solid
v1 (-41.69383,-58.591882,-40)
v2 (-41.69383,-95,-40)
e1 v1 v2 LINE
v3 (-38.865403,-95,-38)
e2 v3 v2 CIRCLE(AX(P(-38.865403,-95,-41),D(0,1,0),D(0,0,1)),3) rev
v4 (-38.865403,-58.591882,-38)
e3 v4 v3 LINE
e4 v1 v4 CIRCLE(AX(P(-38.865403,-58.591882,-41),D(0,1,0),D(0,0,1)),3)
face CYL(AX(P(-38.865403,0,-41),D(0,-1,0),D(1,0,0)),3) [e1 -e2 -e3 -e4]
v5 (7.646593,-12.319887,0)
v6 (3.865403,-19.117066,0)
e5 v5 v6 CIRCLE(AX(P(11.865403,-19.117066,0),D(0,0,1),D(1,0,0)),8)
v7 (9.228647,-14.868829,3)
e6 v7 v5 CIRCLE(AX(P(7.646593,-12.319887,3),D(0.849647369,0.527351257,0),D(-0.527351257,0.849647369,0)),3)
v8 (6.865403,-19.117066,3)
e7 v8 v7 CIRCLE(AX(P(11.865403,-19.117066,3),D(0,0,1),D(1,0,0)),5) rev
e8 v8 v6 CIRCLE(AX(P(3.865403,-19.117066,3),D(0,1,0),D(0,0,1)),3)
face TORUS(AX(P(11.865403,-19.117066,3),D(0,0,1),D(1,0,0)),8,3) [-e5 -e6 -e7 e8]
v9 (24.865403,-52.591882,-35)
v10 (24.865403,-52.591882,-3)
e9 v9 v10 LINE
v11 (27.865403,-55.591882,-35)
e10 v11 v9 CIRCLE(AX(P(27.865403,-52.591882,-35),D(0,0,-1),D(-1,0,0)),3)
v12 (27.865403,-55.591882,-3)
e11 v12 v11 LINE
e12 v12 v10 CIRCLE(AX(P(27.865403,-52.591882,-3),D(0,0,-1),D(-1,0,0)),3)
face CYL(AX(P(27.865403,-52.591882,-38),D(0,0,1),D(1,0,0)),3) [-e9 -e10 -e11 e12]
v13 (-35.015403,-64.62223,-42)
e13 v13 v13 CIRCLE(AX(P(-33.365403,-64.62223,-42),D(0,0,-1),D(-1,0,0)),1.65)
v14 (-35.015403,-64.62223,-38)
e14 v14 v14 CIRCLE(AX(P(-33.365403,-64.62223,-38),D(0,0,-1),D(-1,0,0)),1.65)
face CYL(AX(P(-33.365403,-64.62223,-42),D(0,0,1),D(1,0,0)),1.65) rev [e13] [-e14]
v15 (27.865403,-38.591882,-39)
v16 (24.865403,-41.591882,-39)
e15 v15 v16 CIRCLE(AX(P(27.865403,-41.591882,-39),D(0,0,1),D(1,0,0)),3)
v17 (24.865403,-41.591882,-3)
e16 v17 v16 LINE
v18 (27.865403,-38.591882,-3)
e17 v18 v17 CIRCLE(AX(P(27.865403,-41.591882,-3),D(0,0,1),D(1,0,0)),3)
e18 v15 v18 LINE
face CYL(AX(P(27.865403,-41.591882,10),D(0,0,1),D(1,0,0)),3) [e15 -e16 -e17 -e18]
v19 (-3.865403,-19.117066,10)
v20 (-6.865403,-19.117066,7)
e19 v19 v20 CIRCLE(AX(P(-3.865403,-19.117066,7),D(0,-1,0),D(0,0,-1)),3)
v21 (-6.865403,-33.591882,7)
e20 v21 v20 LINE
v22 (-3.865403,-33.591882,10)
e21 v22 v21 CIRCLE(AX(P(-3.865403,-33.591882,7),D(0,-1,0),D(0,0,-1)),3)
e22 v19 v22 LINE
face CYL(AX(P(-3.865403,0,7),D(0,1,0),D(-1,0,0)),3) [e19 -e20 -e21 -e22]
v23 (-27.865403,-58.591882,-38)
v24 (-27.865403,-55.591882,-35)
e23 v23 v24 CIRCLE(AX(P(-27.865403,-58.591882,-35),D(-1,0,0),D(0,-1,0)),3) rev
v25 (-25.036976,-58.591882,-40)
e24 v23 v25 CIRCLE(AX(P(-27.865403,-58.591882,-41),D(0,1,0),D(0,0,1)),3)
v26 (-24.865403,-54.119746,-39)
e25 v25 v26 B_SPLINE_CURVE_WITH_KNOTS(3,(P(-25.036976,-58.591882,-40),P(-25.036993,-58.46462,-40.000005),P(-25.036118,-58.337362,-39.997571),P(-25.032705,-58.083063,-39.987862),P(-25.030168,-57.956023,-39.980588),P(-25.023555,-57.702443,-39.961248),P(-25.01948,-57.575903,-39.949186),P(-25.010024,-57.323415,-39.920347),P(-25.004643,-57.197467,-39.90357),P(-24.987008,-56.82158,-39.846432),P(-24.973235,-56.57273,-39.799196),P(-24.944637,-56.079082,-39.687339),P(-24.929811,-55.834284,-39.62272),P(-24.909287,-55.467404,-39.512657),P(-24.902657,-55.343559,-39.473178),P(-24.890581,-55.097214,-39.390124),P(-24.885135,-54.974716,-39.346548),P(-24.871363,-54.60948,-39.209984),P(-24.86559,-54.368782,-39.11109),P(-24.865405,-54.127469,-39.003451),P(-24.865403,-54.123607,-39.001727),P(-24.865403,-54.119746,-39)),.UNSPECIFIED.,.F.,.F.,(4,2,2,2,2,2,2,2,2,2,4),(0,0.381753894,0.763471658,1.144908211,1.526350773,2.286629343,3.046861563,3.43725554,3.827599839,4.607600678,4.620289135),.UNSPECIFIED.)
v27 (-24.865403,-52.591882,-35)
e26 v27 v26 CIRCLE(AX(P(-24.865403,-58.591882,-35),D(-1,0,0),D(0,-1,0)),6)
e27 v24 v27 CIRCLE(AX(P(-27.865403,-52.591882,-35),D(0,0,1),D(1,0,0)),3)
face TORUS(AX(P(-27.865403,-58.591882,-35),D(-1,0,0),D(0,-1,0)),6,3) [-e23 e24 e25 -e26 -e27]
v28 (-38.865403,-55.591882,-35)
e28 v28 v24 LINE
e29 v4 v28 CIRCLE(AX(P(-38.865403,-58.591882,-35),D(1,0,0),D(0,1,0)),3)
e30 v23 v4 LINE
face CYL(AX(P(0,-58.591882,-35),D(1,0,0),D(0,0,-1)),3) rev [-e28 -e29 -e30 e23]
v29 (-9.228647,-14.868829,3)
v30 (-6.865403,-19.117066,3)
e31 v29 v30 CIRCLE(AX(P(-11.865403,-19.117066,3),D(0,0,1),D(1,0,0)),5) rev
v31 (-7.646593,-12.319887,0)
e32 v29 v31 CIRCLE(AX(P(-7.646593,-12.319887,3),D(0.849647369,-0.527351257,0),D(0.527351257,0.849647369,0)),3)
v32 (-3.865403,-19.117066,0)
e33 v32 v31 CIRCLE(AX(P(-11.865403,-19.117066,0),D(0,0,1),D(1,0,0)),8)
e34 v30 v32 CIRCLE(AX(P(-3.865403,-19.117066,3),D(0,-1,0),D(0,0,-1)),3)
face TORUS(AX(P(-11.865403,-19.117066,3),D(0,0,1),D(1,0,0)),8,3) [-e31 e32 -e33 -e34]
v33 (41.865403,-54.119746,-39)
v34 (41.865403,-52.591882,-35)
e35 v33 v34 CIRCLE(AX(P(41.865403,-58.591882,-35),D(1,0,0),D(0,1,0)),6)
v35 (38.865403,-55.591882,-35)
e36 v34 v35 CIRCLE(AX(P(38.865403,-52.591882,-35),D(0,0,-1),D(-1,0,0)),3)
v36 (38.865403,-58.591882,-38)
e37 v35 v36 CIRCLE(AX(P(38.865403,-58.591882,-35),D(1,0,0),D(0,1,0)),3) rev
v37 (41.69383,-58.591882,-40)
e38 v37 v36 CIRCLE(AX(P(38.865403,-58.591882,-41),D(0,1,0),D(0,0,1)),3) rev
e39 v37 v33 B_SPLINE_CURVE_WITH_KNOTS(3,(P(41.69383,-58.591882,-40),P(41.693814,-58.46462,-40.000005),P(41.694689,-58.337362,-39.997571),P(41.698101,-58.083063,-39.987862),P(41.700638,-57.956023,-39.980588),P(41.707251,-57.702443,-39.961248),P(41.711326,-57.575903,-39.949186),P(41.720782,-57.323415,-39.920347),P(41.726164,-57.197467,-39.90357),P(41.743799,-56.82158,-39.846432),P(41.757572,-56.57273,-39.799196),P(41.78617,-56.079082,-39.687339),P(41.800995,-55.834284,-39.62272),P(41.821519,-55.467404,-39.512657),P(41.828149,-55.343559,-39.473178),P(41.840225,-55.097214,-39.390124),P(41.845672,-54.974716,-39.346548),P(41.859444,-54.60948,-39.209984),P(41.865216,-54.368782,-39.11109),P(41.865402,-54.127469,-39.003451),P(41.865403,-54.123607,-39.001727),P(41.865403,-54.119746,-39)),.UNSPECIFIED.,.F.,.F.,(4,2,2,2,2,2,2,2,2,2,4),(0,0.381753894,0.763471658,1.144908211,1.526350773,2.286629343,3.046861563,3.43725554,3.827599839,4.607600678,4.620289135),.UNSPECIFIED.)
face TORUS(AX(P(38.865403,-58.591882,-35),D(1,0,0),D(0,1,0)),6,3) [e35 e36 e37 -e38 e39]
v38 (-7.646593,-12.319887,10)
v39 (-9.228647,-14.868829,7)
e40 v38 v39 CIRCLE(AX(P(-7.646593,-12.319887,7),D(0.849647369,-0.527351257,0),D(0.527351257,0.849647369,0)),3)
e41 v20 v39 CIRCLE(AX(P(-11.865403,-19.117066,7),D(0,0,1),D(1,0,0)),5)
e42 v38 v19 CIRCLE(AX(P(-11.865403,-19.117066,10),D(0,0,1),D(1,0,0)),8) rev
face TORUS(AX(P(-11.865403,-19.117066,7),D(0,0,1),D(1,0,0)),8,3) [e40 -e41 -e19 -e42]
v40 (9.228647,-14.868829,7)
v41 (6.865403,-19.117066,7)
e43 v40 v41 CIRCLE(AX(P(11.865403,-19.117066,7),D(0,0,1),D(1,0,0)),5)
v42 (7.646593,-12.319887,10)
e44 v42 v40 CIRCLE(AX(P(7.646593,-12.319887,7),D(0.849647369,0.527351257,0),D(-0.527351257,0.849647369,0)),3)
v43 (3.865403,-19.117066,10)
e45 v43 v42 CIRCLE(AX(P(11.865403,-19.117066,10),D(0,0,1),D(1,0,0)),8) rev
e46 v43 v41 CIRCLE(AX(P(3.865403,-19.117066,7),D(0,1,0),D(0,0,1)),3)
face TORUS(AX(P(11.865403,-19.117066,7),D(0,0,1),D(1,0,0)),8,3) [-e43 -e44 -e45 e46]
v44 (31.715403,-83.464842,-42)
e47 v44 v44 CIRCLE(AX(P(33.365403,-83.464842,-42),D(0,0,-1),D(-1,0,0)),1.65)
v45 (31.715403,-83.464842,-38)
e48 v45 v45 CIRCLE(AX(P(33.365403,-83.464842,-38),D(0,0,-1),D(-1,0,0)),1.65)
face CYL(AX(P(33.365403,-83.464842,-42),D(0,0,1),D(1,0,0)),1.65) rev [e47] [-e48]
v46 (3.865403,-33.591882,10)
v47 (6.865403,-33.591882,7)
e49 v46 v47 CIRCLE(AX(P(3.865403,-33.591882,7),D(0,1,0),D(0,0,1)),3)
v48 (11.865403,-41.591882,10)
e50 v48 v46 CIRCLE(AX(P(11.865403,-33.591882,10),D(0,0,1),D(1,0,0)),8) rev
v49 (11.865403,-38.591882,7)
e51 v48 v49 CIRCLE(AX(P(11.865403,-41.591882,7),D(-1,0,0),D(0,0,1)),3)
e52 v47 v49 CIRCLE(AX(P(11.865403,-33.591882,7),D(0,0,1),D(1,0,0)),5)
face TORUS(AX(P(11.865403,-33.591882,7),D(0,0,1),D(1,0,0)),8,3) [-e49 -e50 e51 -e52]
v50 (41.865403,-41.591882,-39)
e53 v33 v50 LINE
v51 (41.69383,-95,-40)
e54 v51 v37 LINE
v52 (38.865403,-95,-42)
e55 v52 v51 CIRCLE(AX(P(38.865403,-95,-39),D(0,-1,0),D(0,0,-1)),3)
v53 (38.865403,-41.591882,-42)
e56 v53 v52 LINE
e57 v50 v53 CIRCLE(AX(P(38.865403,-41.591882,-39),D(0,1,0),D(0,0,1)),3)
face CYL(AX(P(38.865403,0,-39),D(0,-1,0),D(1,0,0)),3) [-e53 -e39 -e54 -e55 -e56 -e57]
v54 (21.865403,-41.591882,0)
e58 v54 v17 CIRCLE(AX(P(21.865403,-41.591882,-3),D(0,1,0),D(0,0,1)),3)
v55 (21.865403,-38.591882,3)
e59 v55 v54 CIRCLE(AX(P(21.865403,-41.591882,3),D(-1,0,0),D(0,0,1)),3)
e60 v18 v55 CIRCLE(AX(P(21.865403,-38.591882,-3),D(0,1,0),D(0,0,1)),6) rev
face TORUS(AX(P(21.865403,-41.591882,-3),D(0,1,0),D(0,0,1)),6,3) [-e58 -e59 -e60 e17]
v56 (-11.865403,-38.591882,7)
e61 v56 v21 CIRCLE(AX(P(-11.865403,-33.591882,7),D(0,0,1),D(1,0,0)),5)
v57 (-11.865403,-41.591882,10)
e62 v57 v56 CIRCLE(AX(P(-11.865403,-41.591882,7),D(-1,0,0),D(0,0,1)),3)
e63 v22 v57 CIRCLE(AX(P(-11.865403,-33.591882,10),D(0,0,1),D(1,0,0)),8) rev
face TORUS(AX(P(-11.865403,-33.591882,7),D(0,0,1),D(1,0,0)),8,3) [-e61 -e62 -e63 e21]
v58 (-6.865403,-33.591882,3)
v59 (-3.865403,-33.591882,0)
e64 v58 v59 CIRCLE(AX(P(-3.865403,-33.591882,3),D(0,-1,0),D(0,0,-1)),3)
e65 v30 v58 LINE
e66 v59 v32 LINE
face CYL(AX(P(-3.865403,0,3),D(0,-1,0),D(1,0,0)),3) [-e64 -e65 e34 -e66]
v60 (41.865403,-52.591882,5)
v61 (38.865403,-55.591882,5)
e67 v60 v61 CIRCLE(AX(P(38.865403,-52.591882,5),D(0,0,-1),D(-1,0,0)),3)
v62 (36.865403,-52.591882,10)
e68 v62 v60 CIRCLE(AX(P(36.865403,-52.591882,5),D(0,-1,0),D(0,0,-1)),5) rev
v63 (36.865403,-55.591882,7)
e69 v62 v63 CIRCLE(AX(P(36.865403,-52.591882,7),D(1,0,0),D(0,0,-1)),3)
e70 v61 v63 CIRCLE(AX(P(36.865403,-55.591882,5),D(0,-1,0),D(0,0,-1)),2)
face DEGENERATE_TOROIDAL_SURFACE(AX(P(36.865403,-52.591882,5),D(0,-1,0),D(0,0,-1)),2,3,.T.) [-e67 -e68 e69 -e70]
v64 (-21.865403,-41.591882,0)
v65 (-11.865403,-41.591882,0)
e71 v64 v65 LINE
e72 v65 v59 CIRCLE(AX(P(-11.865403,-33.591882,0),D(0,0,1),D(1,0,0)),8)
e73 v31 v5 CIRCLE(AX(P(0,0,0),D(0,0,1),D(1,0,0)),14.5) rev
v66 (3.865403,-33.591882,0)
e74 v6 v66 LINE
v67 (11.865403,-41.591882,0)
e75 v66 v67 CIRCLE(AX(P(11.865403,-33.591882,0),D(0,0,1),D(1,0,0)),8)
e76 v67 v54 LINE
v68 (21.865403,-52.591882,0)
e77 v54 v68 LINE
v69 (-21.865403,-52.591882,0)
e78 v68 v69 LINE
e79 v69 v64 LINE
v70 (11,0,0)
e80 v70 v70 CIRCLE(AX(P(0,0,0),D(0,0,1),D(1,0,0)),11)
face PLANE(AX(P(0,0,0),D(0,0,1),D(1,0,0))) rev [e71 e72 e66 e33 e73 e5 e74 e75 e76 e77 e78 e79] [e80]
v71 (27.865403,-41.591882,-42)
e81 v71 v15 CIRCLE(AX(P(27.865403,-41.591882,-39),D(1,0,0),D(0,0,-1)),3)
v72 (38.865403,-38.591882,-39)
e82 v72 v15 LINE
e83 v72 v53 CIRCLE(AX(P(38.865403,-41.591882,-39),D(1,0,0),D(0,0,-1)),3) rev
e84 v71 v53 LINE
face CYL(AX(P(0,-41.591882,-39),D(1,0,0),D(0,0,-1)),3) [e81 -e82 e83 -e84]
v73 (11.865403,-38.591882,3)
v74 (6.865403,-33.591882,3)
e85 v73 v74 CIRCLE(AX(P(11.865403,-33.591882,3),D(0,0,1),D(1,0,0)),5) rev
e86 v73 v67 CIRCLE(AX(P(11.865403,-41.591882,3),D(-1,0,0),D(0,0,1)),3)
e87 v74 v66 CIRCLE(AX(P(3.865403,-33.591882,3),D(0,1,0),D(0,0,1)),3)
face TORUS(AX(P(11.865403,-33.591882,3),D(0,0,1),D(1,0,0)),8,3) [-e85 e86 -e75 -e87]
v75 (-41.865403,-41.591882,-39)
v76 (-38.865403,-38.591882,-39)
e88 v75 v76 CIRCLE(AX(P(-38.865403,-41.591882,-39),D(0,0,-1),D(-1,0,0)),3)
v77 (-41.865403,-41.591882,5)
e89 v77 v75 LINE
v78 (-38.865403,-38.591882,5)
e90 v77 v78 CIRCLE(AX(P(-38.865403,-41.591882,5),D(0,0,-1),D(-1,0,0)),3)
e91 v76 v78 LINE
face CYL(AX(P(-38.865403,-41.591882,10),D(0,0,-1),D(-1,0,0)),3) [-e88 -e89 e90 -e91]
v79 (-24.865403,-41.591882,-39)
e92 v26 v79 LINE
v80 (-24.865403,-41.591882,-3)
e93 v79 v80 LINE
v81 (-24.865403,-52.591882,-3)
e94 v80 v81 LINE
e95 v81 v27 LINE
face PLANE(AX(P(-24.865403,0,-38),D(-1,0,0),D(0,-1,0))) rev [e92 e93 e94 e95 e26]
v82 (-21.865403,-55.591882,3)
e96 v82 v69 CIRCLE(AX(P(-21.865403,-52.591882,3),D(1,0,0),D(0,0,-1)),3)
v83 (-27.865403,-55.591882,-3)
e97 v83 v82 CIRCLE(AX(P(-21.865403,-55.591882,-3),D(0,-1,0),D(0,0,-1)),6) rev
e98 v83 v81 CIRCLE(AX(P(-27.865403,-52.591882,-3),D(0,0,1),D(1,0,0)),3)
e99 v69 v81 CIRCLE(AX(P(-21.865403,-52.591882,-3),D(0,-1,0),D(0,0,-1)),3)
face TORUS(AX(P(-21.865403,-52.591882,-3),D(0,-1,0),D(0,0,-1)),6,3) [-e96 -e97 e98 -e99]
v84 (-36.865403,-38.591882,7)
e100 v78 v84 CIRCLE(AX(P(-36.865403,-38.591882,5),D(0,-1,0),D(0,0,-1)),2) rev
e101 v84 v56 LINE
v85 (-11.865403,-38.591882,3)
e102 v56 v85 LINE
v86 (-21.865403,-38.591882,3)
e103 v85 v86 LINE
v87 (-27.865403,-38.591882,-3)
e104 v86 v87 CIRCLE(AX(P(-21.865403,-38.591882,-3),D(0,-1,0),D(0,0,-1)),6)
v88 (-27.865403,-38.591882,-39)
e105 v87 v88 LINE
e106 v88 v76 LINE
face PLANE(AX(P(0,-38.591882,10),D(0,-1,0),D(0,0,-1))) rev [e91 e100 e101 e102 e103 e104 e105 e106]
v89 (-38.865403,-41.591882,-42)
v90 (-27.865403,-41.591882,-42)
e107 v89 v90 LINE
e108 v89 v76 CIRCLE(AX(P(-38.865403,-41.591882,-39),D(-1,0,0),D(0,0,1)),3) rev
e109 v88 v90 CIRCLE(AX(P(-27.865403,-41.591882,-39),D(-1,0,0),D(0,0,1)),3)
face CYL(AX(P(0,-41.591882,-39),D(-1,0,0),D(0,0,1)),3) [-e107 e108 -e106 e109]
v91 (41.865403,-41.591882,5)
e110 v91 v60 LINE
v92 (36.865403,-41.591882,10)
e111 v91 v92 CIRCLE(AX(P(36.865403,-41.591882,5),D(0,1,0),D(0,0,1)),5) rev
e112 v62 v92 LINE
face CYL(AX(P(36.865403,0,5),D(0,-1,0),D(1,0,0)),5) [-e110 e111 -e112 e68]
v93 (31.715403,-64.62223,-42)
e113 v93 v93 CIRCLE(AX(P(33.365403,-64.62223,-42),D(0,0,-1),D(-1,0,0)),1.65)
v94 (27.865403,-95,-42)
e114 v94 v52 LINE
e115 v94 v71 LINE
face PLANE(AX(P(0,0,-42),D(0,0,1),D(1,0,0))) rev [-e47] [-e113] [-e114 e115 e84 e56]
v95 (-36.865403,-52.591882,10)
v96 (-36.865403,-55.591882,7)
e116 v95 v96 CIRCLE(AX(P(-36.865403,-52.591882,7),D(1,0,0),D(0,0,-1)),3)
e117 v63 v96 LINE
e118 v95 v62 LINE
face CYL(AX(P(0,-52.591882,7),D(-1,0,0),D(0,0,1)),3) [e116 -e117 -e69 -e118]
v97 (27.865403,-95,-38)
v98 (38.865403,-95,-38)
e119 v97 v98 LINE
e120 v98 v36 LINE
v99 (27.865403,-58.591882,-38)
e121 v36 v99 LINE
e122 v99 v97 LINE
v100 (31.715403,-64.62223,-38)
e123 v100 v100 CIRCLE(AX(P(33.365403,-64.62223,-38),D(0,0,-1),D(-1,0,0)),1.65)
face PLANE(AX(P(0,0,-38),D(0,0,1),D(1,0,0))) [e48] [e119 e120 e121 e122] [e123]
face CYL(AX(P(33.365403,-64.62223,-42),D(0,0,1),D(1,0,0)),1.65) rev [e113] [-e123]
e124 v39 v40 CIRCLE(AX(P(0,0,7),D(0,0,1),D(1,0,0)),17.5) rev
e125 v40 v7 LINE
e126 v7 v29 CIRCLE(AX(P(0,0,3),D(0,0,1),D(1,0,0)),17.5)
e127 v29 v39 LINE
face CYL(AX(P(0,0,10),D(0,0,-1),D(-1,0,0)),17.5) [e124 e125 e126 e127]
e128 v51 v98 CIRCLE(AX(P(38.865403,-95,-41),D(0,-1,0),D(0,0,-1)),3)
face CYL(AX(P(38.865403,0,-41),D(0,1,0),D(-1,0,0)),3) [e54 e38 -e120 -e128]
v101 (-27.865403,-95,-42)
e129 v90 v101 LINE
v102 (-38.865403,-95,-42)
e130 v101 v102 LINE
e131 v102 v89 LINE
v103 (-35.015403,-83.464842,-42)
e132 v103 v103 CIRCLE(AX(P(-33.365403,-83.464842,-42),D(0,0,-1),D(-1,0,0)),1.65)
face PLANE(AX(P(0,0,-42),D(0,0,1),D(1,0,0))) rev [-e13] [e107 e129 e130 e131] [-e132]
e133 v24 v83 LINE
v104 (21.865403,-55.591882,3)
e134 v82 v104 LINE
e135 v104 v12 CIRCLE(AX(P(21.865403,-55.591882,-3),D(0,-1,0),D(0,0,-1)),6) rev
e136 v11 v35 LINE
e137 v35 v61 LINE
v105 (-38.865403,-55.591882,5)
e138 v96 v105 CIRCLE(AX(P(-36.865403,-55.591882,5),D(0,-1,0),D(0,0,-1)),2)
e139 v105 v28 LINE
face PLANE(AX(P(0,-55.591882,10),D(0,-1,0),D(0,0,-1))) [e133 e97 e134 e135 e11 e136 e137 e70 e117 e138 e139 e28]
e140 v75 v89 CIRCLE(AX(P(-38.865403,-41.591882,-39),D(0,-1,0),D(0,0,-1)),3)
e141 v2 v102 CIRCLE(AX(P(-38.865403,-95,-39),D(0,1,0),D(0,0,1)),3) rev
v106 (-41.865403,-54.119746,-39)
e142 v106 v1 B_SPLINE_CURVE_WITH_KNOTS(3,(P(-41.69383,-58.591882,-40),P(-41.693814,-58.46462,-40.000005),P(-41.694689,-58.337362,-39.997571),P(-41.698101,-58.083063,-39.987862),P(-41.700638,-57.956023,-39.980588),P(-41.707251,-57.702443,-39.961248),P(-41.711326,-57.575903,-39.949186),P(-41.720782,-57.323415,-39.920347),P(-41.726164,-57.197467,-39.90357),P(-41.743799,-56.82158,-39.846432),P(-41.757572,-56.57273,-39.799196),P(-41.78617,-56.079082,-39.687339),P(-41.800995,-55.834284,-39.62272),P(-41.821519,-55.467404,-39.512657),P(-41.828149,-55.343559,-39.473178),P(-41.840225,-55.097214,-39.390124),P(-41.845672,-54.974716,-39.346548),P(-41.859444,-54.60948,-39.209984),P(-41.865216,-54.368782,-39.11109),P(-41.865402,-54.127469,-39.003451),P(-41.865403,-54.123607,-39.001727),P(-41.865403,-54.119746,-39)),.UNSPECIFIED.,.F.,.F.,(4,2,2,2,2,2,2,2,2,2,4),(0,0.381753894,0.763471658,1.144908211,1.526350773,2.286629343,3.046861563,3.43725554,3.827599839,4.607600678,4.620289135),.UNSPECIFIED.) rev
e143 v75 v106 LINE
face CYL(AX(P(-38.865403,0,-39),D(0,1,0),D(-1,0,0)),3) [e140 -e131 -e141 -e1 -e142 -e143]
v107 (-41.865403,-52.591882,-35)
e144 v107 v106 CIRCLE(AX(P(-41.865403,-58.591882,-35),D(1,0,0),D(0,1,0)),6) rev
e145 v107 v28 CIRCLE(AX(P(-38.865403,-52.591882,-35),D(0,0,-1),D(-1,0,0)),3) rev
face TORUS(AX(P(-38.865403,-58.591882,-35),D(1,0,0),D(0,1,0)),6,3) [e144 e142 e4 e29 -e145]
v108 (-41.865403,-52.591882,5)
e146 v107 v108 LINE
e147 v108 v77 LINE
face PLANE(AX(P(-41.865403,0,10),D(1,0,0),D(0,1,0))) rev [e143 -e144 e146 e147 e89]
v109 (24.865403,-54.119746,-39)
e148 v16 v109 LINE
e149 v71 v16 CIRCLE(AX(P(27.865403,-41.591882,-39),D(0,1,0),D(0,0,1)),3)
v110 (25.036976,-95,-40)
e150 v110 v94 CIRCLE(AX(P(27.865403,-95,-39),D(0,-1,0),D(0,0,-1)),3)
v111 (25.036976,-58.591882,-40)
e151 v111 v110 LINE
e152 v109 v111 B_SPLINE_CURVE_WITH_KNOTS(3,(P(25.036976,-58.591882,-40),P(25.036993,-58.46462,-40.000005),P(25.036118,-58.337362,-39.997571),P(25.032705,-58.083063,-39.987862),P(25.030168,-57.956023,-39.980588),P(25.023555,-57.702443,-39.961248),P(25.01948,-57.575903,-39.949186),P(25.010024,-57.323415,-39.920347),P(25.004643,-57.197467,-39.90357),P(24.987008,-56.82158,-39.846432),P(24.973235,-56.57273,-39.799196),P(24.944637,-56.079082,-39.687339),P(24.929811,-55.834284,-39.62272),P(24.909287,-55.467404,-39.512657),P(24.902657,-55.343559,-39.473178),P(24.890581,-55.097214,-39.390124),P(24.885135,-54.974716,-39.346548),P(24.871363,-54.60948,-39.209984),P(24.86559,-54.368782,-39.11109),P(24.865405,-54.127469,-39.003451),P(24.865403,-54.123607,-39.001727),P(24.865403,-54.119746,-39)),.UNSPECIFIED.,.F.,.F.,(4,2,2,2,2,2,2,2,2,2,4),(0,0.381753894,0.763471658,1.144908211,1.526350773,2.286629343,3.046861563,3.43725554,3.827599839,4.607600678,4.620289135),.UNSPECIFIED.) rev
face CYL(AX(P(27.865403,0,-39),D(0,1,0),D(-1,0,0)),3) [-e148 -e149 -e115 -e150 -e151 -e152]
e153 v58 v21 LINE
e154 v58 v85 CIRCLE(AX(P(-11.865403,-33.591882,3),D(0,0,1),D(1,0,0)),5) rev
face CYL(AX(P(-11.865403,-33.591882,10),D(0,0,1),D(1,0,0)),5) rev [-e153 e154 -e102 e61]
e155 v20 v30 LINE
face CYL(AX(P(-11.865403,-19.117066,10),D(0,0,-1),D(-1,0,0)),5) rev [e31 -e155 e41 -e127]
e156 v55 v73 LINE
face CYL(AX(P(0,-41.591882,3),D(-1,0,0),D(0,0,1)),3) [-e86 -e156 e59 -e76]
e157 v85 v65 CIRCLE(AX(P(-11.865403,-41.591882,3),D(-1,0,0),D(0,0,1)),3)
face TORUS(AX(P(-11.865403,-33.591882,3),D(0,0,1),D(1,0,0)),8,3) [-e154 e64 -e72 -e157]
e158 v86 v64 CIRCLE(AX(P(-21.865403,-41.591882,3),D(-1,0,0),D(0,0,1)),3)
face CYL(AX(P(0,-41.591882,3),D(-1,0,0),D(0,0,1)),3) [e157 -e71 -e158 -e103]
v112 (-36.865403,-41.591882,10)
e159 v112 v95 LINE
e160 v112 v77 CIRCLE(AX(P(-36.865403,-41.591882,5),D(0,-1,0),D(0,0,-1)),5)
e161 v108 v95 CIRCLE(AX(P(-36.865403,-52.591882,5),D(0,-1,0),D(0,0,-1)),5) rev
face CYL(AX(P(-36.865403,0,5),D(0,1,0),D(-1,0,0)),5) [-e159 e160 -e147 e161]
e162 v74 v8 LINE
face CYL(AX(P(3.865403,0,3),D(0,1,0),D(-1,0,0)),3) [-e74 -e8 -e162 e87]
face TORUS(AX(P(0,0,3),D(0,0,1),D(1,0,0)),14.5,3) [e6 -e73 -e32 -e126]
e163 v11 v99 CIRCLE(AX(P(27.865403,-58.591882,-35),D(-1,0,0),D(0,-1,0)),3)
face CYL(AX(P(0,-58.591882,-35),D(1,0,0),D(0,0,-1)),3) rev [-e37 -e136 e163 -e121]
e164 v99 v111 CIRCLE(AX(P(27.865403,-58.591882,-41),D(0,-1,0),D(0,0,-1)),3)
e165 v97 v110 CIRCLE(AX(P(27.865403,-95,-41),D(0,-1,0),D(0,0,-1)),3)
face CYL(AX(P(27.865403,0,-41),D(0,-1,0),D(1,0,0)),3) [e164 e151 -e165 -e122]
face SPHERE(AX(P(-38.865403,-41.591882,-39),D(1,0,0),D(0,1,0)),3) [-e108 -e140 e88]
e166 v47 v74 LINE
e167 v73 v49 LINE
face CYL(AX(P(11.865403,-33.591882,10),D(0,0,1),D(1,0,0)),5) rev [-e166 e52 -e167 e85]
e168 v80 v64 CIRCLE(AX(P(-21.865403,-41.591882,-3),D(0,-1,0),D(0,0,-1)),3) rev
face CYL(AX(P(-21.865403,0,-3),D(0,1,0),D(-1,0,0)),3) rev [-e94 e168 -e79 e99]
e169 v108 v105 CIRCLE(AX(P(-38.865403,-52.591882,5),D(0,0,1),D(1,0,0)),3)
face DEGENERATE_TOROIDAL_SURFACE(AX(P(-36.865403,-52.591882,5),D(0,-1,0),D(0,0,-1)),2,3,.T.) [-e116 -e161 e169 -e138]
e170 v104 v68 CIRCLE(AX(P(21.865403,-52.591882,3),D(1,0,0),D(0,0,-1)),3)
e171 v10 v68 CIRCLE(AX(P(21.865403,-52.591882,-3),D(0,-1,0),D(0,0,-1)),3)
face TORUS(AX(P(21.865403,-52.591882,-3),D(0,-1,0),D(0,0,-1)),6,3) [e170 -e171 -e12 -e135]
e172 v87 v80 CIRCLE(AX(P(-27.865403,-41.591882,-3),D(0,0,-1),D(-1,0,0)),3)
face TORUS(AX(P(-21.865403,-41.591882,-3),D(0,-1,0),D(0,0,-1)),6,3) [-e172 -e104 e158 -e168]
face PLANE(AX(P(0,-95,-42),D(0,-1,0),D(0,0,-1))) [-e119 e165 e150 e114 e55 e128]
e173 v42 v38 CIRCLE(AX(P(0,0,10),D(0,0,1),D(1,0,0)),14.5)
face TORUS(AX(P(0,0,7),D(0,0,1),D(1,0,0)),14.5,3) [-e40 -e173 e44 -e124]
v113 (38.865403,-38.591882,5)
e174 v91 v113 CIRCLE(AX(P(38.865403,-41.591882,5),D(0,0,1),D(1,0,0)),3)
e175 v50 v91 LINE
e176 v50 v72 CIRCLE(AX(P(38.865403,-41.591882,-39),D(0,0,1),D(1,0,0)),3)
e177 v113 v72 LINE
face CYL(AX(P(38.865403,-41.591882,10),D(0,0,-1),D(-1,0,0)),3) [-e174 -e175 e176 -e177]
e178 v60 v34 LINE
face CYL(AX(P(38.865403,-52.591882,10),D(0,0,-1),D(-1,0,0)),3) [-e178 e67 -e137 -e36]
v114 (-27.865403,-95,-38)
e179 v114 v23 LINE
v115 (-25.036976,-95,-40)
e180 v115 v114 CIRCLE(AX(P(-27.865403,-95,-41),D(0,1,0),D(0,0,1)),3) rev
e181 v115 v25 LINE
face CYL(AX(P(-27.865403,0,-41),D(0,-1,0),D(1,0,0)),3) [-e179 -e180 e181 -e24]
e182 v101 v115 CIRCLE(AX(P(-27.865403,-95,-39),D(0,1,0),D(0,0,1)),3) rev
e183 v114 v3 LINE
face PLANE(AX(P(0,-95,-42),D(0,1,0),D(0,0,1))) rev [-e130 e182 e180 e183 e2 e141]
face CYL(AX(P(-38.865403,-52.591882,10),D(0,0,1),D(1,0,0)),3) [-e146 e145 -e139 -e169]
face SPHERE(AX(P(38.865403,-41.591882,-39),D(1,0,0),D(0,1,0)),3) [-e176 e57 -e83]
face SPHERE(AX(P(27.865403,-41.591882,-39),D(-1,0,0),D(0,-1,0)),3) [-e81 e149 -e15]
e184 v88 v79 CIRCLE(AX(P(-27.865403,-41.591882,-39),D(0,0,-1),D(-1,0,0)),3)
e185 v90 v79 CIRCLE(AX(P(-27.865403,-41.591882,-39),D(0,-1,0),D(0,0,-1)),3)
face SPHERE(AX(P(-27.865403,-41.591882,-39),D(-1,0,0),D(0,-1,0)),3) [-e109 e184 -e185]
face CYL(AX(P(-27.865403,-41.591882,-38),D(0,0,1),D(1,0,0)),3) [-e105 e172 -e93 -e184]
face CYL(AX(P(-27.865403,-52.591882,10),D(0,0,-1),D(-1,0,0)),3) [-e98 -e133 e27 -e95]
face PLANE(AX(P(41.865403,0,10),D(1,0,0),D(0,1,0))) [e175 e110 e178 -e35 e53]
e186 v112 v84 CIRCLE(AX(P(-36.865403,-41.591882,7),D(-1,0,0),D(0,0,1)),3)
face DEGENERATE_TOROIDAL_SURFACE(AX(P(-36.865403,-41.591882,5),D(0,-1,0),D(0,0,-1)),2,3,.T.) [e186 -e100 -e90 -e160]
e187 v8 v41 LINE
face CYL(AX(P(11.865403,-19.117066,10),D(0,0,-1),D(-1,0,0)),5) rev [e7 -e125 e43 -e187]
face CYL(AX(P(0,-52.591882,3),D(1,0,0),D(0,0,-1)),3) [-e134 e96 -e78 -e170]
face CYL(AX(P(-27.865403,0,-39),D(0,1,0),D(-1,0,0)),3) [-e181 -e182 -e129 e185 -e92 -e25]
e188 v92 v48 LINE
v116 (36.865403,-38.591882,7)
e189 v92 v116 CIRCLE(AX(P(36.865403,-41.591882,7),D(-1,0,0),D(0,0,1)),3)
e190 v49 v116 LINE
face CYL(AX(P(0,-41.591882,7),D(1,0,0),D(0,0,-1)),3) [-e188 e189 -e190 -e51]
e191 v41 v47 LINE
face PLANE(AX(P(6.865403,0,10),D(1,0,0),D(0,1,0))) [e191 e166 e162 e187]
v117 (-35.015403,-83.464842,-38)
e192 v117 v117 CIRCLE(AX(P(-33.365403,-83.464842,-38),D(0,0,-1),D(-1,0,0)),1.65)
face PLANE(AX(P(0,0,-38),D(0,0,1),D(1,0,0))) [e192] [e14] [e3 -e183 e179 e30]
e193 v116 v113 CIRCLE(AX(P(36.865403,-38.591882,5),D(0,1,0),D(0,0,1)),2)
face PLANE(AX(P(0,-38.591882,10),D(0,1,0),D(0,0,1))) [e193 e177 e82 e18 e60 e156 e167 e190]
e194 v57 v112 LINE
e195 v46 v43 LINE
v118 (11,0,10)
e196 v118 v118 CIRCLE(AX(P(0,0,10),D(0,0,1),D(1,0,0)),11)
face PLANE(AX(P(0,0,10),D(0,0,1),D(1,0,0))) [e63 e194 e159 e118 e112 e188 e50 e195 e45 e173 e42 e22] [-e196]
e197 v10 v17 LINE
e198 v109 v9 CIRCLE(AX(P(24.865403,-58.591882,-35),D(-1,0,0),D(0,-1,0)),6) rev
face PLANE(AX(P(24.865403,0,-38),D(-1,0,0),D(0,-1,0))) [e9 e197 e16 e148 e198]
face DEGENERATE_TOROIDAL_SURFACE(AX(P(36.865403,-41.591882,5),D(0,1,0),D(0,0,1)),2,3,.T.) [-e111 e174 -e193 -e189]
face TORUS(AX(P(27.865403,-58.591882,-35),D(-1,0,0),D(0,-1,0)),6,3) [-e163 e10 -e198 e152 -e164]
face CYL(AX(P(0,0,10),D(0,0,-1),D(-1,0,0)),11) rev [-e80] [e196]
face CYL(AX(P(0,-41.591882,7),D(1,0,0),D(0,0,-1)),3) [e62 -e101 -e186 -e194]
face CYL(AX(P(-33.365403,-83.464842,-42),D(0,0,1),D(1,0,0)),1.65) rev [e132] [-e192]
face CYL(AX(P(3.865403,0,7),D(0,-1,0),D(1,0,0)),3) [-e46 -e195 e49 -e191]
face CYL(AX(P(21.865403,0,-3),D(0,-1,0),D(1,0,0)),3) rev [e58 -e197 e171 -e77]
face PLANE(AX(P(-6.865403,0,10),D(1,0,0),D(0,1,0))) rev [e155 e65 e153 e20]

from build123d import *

# Parameters (mm, degrees)
CROQUIS5_R              = 17.5
CROQUIS5_R_2            = 11
SALIENTE_EXTRUIR4_DEPTH = 10
CROQUIS6_W              = 17
CROQUIS6_H              = 17
SALIENTE_EXTRUIR5_DEPTH = 10
REDONDEO2_R             = 5
CROQUIS6_4_W            = 17
CROQUIS6_4_H            = 17
SALIENTE_EXTRUIR6_DEPTH = 38
REDONDEO3_R             = 5
SALIENTE_EXTRUIR7_START = 38
CROQUIS6_5_W            = 17
CROQUIS6_5_H            = 56.408117822
CROQUIS6_5_R            = 1.65
SALIENTE_EXTRUIR7_DEPTH = 4
REDONDEO4_R             = 3
REDONDEO5_R             = 3
REDONDEO6_R             = 3
REDONDEO7_R             = 3


with BuildPart() as part:
    # Croquis5 → Saliente-Extruir4 (new body)
    with BuildSketch(Plane.XY):
        Circle(CROQUIS5_R)
        Circle(CROQUIS5_R_2, mode=Mode.SUBTRACT)
    extrude(amount=SALIENTE_EXTRUIR4_DEPTH)

    # Croquis6 → Saliente-Extruir5 (add)
    with BuildSketch(Plane(origin=(0, 0, 0), x_dir=(-1, 0, 0), z_dir=(0, 0, -1))):
        with BuildLine():
            ThreePointArc((6.86540329, -16.097087863), (0, -17.5), (-6.86540329, -16.097087863))
            Line((-6.86540329, -16.097087863), (-6.86540329, -38.591882178))
            Line((-6.86540329, -38.591882178), (-24.86540329, -38.591882178))
            Line((-24.86540329, -38.591882178), (-24.86540329, -55.591882178))
            Line((-24.86540329, -55.591882178), (24.86540329, -55.591882178))
            Line((24.86540329, -55.591882178), (24.86540329, -38.591882178))
            Line((24.86540329, -38.591882178), (6.86540329, -38.591882178))
            Line((6.86540329, -38.591882178), (6.86540329, -16.097087863))
        make_face()
        with Locations((-33.36540329, -47.091882178)):
            Rectangle(CROQUIS6_W, CROQUIS6_H)
        with Locations((33.36540329, -47.091882178)):
            Rectangle(CROQUIS6_W, CROQUIS6_H)
    extrude(amount=-SALIENTE_EXTRUIR5_DEPTH)

    # Redondeo2
    redondeo2_edges = [part.edges().sort_by_distance(p)[0] for p in [
        (-6.86540329, -16.097087863, 5),
        (-6.86540329, -38.591882178, 5),
        (6.86540329, -38.591882178, 5),
        (6.86540329, -16.097087863, 5),
    ]]
    fillet(redondeo2_edges, radius=REDONDEO2_R)

    # Croquis6<4> → Saliente-Extruir6 (add)
    with BuildSketch(Plane(origin=(0, 0, 0), x_dir=(-1, 0, 0), z_dir=(0, 0, -1))):
        with Locations((33.36540329, -47.091882178)):
            Rectangle(CROQUIS6_4_W, CROQUIS6_4_H)
        with Locations((-33.36540329, -47.091882178)):
            Rectangle(CROQUIS6_4_W, CROQUIS6_4_H)
    extrude(amount=SALIENTE_EXTRUIR6_DEPTH)

    # Redondeo3
    redondeo3_edges = [part.edges().sort_by_distance(p)[0] for p in [
        (41.86540329, -47.091882178, 10),
        (-41.86540329, -47.091882178, 10),
    ]]
    fillet(redondeo3_edges, radius=REDONDEO3_R)

    # Croquis6<5> → Saliente-Extruir7 (add)
    # profile 1 of 2: a face of its own
    with BuildSketch(Plane(origin=(0, 0, 0), x_dir=(-1, 0, 0), z_dir=(0, 0, -1)).offset(SALIENTE_EXTRUIR7_START)):
        with Locations((-33.36540329, -66.795941089)):
            Rectangle(CROQUIS6_5_W, CROQUIS6_5_H)
        with Locations((-33.36540329, -64.62222969)):
            Circle(CROQUIS6_5_R, mode=Mode.SUBTRACT)
        with Locations((-33.36540329, -83.464842185)):
            Circle(CROQUIS6_5_R, mode=Mode.SUBTRACT)
    # profile 2 of 2: a face of its own
    with BuildSketch(Plane(origin=(0, 0, 0), x_dir=(-1, 0, 0), z_dir=(0, 0, -1)).offset(SALIENTE_EXTRUIR7_START)):
        with Locations((33.36540329, -66.795941089)):
            Rectangle(CROQUIS6_5_W, CROQUIS6_5_H)
        with Locations((33.36540329, -64.62222969)):
            Circle(CROQUIS6_5_R, mode=Mode.SUBTRACT)
        with Locations((33.36540329, -83.464842185)):
            Circle(CROQUIS6_5_R, mode=Mode.SUBTRACT)
    extrude(amount=SALIENTE_EXTRUIR7_DEPTH)

    # Redondeo4
    redondeo4_edges = [part.edges().sort_by_distance(p)[0] for p in [
        (0, -55.591882178, 10),
        (-41.86540329, -55.591882178, -16.5),
        (-40.400937196, -55.591882178, 8.535533906),
        (40.400937196, -55.591882178, 8.535533906),
        (-41.86540329, -75.295941089, -38),
        (41.86540329, -75.295941089, -38),
        (-24.86540329, -47.091882178, 0),
        (-33.36540329, -55.591882178, -38),
        (33.36540329, -55.591882178, -38),
        (24.86540329, -47.091882178, 0),
        (41.86540329, -55.591882178, -16.5),
    ]]
    fillet(redondeo4_edges, radius=REDONDEO4_R)

    # Redondeo5
    redondeo5_edges = [part.edges().sort_by_distance(p)[0] for p in [
        (-33.36540329, -38.591882178, -42),
        (33.36540329, -38.591882178, -42),
    ]]
    fillet(redondeo5_edges, radius=REDONDEO5_R)

    # Redondeo6
    redondeo6_edges = [part.edges().sort_by_distance(p)[0] for p in [
        (-24.86540329, -76.795941089, -38),
        (24.86540329, -76.795941089, -38),
        (-24.86540329, -55.591882178, -19),
        (0, -55.591882178, 0),
        (24.86540329, -55.591882178, -19),
        (23.986723634, -55.591882178, -0.878679656),
        (-23.986723634, -55.591882178, -0.878679656),
        (24.86540329, -56.470561835, -37.121320344),
        (-24.86540329, -56.470561835, -37.121320344),
    ]]
    fillet(redondeo6_edges, radius=REDONDEO6_R)

    # Redondeo7
    # the kernel refuses this fillet: 3 mm, written as the material it takes off along each edge
    with BuildSketch(Plane(origin=(-24.86540329, -41.591882178, -42), x_dir=(0, 0, 1), z_dir=(0, -1, 0)), Plane(origin=(24.86540329, -102.5, -42), x_dir=(0, 0, 1), z_dir=(0, 1, 0)), Plane(origin=(41.86540329, -41.591882178, -42), x_dir=(0, 0, 1), z_dir=(0, -1, 0))) as redondeo7_piece_1:
        with BuildLine():
            CenterArc((REDONDEO7_R, REDONDEO7_R), REDONDEO7_R, 180, 90)
            Line((0, REDONDEO7_R), (0, 0))
            Line((0, 0), (REDONDEO7_R, 0))
        make_face()
    extrude(amount=60.908117822, mode=Mode.SUBTRACT)
    with BuildSketch(Plane(origin=(-24.86540329, -41.591882178, -39), x_dir=(0, 1, 0), z_dir=(0, 0, 1))) as redondeo7_piece_2:
        with BuildLine():
            CenterArc((3 - REDONDEO7_R, REDONDEO7_R), REDONDEO7_R, 270, 90)
            Line((3, REDONDEO7_R), (3, 0))
            Line((3, 0), (3 - REDONDEO7_R, 0))
        make_face()
    revolve(axis=Axis((-24.86540329, -41.591882178, -39), (-1, 0, 0)), revolution_arc=90, mode=Mode.SUBTRACT)
    with BuildSketch(Plane(origin=(-24.86540329, -38.591882178, -3), x_dir=(0, -1, 0), z_dir=(0, 0, -1))) as redondeo7_piece_3:
        with BuildLine():
            CenterArc((REDONDEO7_R, REDONDEO7_R), REDONDEO7_R, 180, 90)
            Line((0, REDONDEO7_R), (0, 0))
            Line((0, 0), (REDONDEO7_R, 0))
        make_face()
    extrude(amount=36, mode=Mode.SUBTRACT)
    with BuildSketch(Plane(origin=(-21.86540329, -38.591882178, -3), x_dir=(0, 0, 1), z_dir=(1, 0, 0))) as redondeo7_piece_4:
        with BuildLine():
            CenterArc((3 + REDONDEO7_R, REDONDEO7_R), REDONDEO7_R, 180, 90)
            Line((3 + REDONDEO7_R, 0), (3, 0))
            Line((3, 0), (3, REDONDEO7_R))
        make_face()
    revolve(axis=Axis((-21.86540329, -38.591882178, -3), (0, -1, 0)), revolution_arc=90, mode=Mode.SUBTRACT)
    with BuildSketch(Plane(origin=(-21.86540329, -38.591882178, 0), x_dir=(0, 0, 1), z_dir=(1, 0, 0))) as redondeo7_piece_5:
        with BuildLine():
            CenterArc((REDONDEO7_R, REDONDEO7_R), REDONDEO7_R, 180, 90)
            Line((0, REDONDEO7_R), (0, 0))
            Line((0, 0), (REDONDEO7_R, 0))
        make_face()
    extrude(amount=10, mode=Mode.SUBTRACT)
    with BuildSketch(Plane(origin=(-11.86540329, -33.591882178, 0), x_dir=(1, 0, 0), z_dir=(0, 1, 0))) as redondeo7_piece_6:
        with BuildLine():
            CenterArc((5 + REDONDEO7_R, -REDONDEO7_R), REDONDEO7_R, 90, 90)
            Line((5, -REDONDEO7_R), (5, 0))
            Line((5, 0), (5 + REDONDEO7_R, 0))
        make_face()
    revolve(axis=Axis((-11.86540329, -33.591882178, 0), (0, 0, -1)), revolution_arc=90, mode=Mode.SUBTRACT)
    with BuildSketch(Plane(origin=(-6.86540329, -33.591882178, 10), x_dir=(1, 0, 0), z_dir=(0, 1, 0)), Plane(origin=(6.86540329, -19.117065799, 10), x_dir=(-1, 0, 0), z_dir=(0, -1, 0))) as redondeo7_piece_7:
        with BuildLine():
            CenterArc((REDONDEO7_R, REDONDEO7_R), REDONDEO7_R, 180, 90)
            Line((0, REDONDEO7_R), (0, 0))
            Line((0, 0), (REDONDEO7_R, 0))
        make_face()
    extrude(amount=14.474816379, mode=Mode.SUBTRACT)
    with BuildSketch(Plane(origin=(-6.86540329, -33.591882178, 0), x_dir=(1, 0, 0), z_dir=(0, 1, 0)), Plane(origin=(6.86540329, -19.117065799, 0), x_dir=(-1, 0, 0), z_dir=(0, -1, 0))) as redondeo7_piece_8:
        with BuildLine():
            CenterArc((REDONDEO7_R, -REDONDEO7_R), REDONDEO7_R, 90, 90)
            Line((0, -REDONDEO7_R), (0, 0))
            Line((0, 0), (REDONDEO7_R, 0))
        make_face()
    extrude(amount=14.474816379, mode=Mode.SUBTRACT)
    with BuildSketch(Plane(origin=(-11.86540329, -19.117065799, 0), x_dir=(0.5273512573366691, 0.8496473688451193, 0), z_dir=(-0.8496473688451193, 0.5273512573366691, 0))) as redondeo7_piece_9:
        with BuildLine():
            CenterArc((5 + REDONDEO7_R, -REDONDEO7_R), REDONDEO7_R, 90, 90)
            Line((5, -REDONDEO7_R), (5, 0))
            Line((5, 0), (5 + REDONDEO7_R, 0))
        make_face()
    revolve(axis=Axis((-11.86540329, -19.117065799, 0), (0, 0, -1)), revolution_arc=58.17333597, mode=Mode.SUBTRACT)
    with BuildSketch(Plane(origin=(0, 0, 0), x_dir=(0.527351257336669, -0.8496473688451194, 0), z_dir=(-0.8496473688451194, -0.527351257336669, 0))) as redondeo7_piece_10:
        with BuildLine():
            CenterArc((17.5 - REDONDEO7_R, REDONDEO7_R), REDONDEO7_R, 270, 90)
            Line((17.5, REDONDEO7_R), (17.5, 0))
            Line((17.5, 0), (17.5 - REDONDEO7_R, 0))
        make_face()
    revolve(axis=Axis((0, 0, 0), (0, 0, 1)), revolution_arc=296.346671939, mode=Mode.SUBTRACT)
    with BuildSketch(Plane(origin=(11.86540329, -19.117065799, 0), x_dir=(-0.5273512573366712, 0.8496473688451178, 0), z_dir=(0.8496473688451178, 0.5273512573366712, 0))) as redondeo7_piece_11:
        with BuildLine():
            CenterArc((5 + REDONDEO7_R, REDONDEO7_R), REDONDEO7_R, 180, 90)
            Line((5, REDONDEO7_R), (5, 0))
            Line((5, 0), (5 + REDONDEO7_R, 0))
        make_face()
    revolve(axis=Axis((11.86540329, -19.117065799, 0), (0, 0, 1)), revolution_arc=58.17333597, mode=Mode.SUBTRACT)
    with BuildSketch(Plane(origin=(24.86540329, -41.591882178, -39), x_dir=(0, 1, 0), z_dir=(0, 0, 1))) as redondeo7_piece_12:
        with BuildLine():
            CenterArc((3 - REDONDEO7_R, -REDONDEO7_R), REDONDEO7_R, 0, 90)
            Line((3, -REDONDEO7_R), (3, 0))
            Line((3, 0), (3 - REDONDEO7_R, 0))
        make_face()
    revolve(axis=Axis((24.86540329, -41.591882178, -39), (-1, 0, 0)), revolution_arc=90, mode=Mode.SUBTRACT)
    with BuildSketch(Plane(origin=(24.86540329, -38.591882178, -39), x_dir=(1, 0, 0), z_dir=(0, 0, 1))) as redondeo7_piece_13:
        with BuildLine():
            CenterArc((REDONDEO7_R, -REDONDEO7_R), REDONDEO7_R, 90, 90)
            Line((0, -REDONDEO7_R), (0, 0))
            Line((0, 0), (REDONDEO7_R, 0))
        make_face()
    extrude(amount=36, mode=Mode.SUBTRACT)
    with BuildSketch(Plane(origin=(21.86540329, -38.591882178, -3), x_dir=(0, 0, 1), z_dir=(-1, 0, 0))) as redondeo7_piece_14:
        with BuildLine():
            CenterArc((3 + REDONDEO7_R, -REDONDEO7_R), REDONDEO7_R, 90, 90)
            Line((3 + REDONDEO7_R, 0), (3, 0))
            Line((3, 0), (3, -REDONDEO7_R))
        make_face()
    revolve(axis=Axis((21.86540329, -38.591882178, -3), (0, 1, 0)), revolution_arc=90, mode=Mode.SUBTRACT)
    with BuildSketch(Plane(origin=(11.86540329, -38.591882178, 0), x_dir=(0, -1, 0), z_dir=(1, 0, 0))) as redondeo7_piece_15:
        with BuildLine():
            CenterArc((REDONDEO7_R, -REDONDEO7_R), REDONDEO7_R, 90, 90)
            Line((0, -REDONDEO7_R), (0, 0))
            Line((0, 0), (REDONDEO7_R, 0))
        make_face()
    extrude(amount=10, mode=Mode.SUBTRACT)
    with BuildSketch(Plane(origin=(11.86540329, -33.591882178, 0), x_dir=(0, -1, 0), z_dir=(1, 0, 0))) as redondeo7_piece_16:
        with BuildLine():
            CenterArc((5 + REDONDEO7_R, -REDONDEO7_R), REDONDEO7_R, 90, 90)
            Line((5, -REDONDEO7_R), (5, 0))
            Line((5, 0), (5 + REDONDEO7_R, 0))
        make_face()
    revolve(axis=Axis((11.86540329, -33.591882178, 0), (0, 0, -1)), revolution_arc=90, mode=Mode.SUBTRACT)
    with BuildSketch(Plane(origin=(-41.86540329, -102.5, -42), x_dir=(1, 0, 0), z_dir=(0, 1, 0))) as redondeo7_piece_17:
        with BuildLine():
            CenterArc((REDONDEO7_R, -REDONDEO7_R), REDONDEO7_R, 90, 90)
            Line((0, -REDONDEO7_R), (0, 0))
            Line((0, 0), (REDONDEO7_R, 0))
        make_face()
    extrude(amount=60.908117822, mode=Mode.SUBTRACT)
    with BuildSketch(Plane(origin=(-41.86540329, -41.591882178, -39), x_dir=(0, 1, 0), z_dir=(0, 0, 1))) as redondeo7_piece_18:
        with BuildLine():
            CenterArc((3 - REDONDEO7_R, -REDONDEO7_R), REDONDEO7_R, 0, 90)
            Line((3 - REDONDEO7_R, 0), (3, 0))
            Line((3, 0), (3, -REDONDEO7_R))
        make_face()
    revolve(axis=Axis((-41.86540329, -41.591882178, -39), (-1, 0, 0)), revolution_arc=90, mode=Mode.SUBTRACT)
    with BuildSketch(Plane(origin=(-41.86540329, -38.591882178, -39), x_dir=(1, 0, 0), z_dir=(0, 0, 1)), Plane(origin=(41.86540329, -38.591882178, 5), x_dir=(-1, 0, 0), z_dir=(0, 0, -1))) as redondeo7_piece_19:
        with BuildLine():
            CenterArc((REDONDEO7_R, -REDONDEO7_R), REDONDEO7_R, 90, 90)
            Line((0, -REDONDEO7_R), (0, 0))
            Line((0, 0), (REDONDEO7_R, 0))
        make_face()
    extrude(amount=44, mode=Mode.SUBTRACT)
    with BuildSketch(Plane(origin=(-36.86540329, -38.591882178, 5), x_dir=(0, 0, 1), z_dir=(1, 0, 0))) as redondeo7_piece_20:
        with BuildLine():
            CenterArc((5 - REDONDEO7_R, REDONDEO7_R), REDONDEO7_R, 270, 90)
            Line((5, REDONDEO7_R), (5, 0))
            Line((5, 0), (5 - REDONDEO7_R, 0))
        make_face()
    revolve(axis=Axis((-36.86540329, -38.591882178, 5), (0, -1, 0)), revolution_arc=90, mode=Mode.SUBTRACT)
    with BuildSketch(Plane(origin=(-11.86540329, -33.591882178, 10), x_dir=(1, 0, 0), z_dir=(0, 1, 0))) as redondeo7_piece_21:
        with BuildLine():
            CenterArc((5 + REDONDEO7_R, REDONDEO7_R), REDONDEO7_R, 180, 90)
            Line((5 + REDONDEO7_R, 0), (5, 0))
            Line((5, 0), (5, REDONDEO7_R))
        make_face()
    revolve(axis=Axis((-11.86540329, -33.591882178, 10), (0, 0, -1)), revolution_arc=90, mode=Mode.SUBTRACT)
    with BuildSketch(Plane(origin=(-11.86540329, -19.117065799, 10), x_dir=(0.5273512573366684, 0.8496473688451196, 0), z_dir=(-0.8496473688451196, 0.5273512573366684, 0))) as redondeo7_piece_22:
        with BuildLine():
            CenterArc((5 + REDONDEO7_R, REDONDEO7_R), REDONDEO7_R, 180, 90)
            Line((5, REDONDEO7_R), (5, 0))
            Line((5, 0), (5 + REDONDEO7_R, 0))
        make_face()
    revolve(axis=Axis((-11.86540329, -19.117065799, 10), (0, 0, -1)), revolution_arc=58.17333597, mode=Mode.SUBTRACT)
    with BuildSketch(Plane(origin=(0, 0, 10), x_dir=(-0.5273512573366697, -0.8496473688451189, 0), z_dir=(0.8496473688451189, -0.5273512573366697, 0))) as redondeo7_piece_23:
        with BuildLine():
            CenterArc((17.5 - REDONDEO7_R, REDONDEO7_R), REDONDEO7_R, 270, 90)
            Line((17.5, REDONDEO7_R), (17.5, 0))
            Line((17.5, 0), (17.5 - REDONDEO7_R, 0))
        make_face()
    revolve(axis=Axis((0, 0, 10), (0, 0, -1)), revolution_arc=296.346671939, mode=Mode.SUBTRACT)
    with BuildSketch(Plane(origin=(11.86540329, -19.117065799, 10), x_dir=(-0.5273512573366712, 0.8496473688451178, 0), z_dir=(0.8496473688451178, 0.5273512573366712, 0))) as redondeo7_piece_24:
        with BuildLine():
            CenterArc((5 + REDONDEO7_R, -REDONDEO7_R), REDONDEO7_R, 90, 90)
            Line((5, -REDONDEO7_R), (5, 0))
            Line((5, 0), (5 + REDONDEO7_R, 0))
        make_face()
    revolve(axis=Axis((11.86540329, -19.117065799, 10), (0, 0, 1)), revolution_arc=58.17333597, mode=Mode.SUBTRACT)
    with BuildSketch(Plane(origin=(11.86540329, -33.591882178, 10), x_dir=(0, -1, 0), z_dir=(1, 0, 0))) as redondeo7_piece_25:
        with BuildLine():
            CenterArc((5 + REDONDEO7_R, REDONDEO7_R), REDONDEO7_R, 180, 90)
            Line((5, REDONDEO7_R), (5, 0))
            Line((5, 0), (5 + REDONDEO7_R, 0))
        make_face()
    revolve(axis=Axis((11.86540329, -33.591882178, 10), (0, 0, -1)), revolution_arc=90, mode=Mode.SUBTRACT)
    with BuildSketch(Plane(origin=(41.86540329, -41.591882178, -39), x_dir=(0, 1, 0), z_dir=(0, 0, 1))) as redondeo7_piece_26:
        with BuildLine():
            CenterArc((3 - REDONDEO7_R, REDONDEO7_R), REDONDEO7_R, 270, 90)
            Line((3 - REDONDEO7_R, 0), (3, 0))
            Line((3, 0), (3, REDONDEO7_R))
        make_face()
    revolve(axis=Axis((41.86540329, -41.591882178, -39), (-1, 0, 0)), revolution_arc=90, mode=Mode.SUBTRACT)
    with BuildSketch(Plane(origin=(36.86540329, -38.591882178, 5), x_dir=(0, 0, 1), z_dir=(-1, 0, 0))) as redondeo7_piece_27:
        with BuildLine():
            CenterArc((5 - REDONDEO7_R, -REDONDEO7_R), REDONDEO7_R, 0, 90)
            Line((5, -REDONDEO7_R), (5, 0))
            Line((5, 0), (5 - REDONDEO7_R, 0))
        make_face()
    revolve(axis=Axis((36.86540329, -38.591882178, 5), (0, 1, 0)), revolution_arc=90, mode=Mode.SUBTRACT)
    with BuildSketch(Plane(origin=(-11.86540329, -38.591882178, 10), x_dir=(0, 0, -1), z_dir=(-1, 0, 0))) as redondeo7_piece_28:
        with BuildLine():
            CenterArc((REDONDEO7_R, REDONDEO7_R), REDONDEO7_R, 180, 90)
            Line((0, REDONDEO7_R), (0, 0))
            Line((0, 0), (REDONDEO7_R, 0))
        make_face()
    extrude(amount=25, mode=Mode.SUBTRACT)
    with BuildSketch(Plane(origin=(36.86540329, -38.591882178, 10), x_dir=(0, -1, 0), z_dir=(-1, 0, 0))) as redondeo7_piece_29:
        with BuildLine():
            CenterArc((REDONDEO7_R, -REDONDEO7_R), REDONDEO7_R, 90, 90)
            Line((0, -REDONDEO7_R), (0, 0))
            Line((0, 0), (REDONDEO7_R, 0))
        make_face()
    extrude(amount=25, mode=Mode.SUBTRACT)


solid = part.part
